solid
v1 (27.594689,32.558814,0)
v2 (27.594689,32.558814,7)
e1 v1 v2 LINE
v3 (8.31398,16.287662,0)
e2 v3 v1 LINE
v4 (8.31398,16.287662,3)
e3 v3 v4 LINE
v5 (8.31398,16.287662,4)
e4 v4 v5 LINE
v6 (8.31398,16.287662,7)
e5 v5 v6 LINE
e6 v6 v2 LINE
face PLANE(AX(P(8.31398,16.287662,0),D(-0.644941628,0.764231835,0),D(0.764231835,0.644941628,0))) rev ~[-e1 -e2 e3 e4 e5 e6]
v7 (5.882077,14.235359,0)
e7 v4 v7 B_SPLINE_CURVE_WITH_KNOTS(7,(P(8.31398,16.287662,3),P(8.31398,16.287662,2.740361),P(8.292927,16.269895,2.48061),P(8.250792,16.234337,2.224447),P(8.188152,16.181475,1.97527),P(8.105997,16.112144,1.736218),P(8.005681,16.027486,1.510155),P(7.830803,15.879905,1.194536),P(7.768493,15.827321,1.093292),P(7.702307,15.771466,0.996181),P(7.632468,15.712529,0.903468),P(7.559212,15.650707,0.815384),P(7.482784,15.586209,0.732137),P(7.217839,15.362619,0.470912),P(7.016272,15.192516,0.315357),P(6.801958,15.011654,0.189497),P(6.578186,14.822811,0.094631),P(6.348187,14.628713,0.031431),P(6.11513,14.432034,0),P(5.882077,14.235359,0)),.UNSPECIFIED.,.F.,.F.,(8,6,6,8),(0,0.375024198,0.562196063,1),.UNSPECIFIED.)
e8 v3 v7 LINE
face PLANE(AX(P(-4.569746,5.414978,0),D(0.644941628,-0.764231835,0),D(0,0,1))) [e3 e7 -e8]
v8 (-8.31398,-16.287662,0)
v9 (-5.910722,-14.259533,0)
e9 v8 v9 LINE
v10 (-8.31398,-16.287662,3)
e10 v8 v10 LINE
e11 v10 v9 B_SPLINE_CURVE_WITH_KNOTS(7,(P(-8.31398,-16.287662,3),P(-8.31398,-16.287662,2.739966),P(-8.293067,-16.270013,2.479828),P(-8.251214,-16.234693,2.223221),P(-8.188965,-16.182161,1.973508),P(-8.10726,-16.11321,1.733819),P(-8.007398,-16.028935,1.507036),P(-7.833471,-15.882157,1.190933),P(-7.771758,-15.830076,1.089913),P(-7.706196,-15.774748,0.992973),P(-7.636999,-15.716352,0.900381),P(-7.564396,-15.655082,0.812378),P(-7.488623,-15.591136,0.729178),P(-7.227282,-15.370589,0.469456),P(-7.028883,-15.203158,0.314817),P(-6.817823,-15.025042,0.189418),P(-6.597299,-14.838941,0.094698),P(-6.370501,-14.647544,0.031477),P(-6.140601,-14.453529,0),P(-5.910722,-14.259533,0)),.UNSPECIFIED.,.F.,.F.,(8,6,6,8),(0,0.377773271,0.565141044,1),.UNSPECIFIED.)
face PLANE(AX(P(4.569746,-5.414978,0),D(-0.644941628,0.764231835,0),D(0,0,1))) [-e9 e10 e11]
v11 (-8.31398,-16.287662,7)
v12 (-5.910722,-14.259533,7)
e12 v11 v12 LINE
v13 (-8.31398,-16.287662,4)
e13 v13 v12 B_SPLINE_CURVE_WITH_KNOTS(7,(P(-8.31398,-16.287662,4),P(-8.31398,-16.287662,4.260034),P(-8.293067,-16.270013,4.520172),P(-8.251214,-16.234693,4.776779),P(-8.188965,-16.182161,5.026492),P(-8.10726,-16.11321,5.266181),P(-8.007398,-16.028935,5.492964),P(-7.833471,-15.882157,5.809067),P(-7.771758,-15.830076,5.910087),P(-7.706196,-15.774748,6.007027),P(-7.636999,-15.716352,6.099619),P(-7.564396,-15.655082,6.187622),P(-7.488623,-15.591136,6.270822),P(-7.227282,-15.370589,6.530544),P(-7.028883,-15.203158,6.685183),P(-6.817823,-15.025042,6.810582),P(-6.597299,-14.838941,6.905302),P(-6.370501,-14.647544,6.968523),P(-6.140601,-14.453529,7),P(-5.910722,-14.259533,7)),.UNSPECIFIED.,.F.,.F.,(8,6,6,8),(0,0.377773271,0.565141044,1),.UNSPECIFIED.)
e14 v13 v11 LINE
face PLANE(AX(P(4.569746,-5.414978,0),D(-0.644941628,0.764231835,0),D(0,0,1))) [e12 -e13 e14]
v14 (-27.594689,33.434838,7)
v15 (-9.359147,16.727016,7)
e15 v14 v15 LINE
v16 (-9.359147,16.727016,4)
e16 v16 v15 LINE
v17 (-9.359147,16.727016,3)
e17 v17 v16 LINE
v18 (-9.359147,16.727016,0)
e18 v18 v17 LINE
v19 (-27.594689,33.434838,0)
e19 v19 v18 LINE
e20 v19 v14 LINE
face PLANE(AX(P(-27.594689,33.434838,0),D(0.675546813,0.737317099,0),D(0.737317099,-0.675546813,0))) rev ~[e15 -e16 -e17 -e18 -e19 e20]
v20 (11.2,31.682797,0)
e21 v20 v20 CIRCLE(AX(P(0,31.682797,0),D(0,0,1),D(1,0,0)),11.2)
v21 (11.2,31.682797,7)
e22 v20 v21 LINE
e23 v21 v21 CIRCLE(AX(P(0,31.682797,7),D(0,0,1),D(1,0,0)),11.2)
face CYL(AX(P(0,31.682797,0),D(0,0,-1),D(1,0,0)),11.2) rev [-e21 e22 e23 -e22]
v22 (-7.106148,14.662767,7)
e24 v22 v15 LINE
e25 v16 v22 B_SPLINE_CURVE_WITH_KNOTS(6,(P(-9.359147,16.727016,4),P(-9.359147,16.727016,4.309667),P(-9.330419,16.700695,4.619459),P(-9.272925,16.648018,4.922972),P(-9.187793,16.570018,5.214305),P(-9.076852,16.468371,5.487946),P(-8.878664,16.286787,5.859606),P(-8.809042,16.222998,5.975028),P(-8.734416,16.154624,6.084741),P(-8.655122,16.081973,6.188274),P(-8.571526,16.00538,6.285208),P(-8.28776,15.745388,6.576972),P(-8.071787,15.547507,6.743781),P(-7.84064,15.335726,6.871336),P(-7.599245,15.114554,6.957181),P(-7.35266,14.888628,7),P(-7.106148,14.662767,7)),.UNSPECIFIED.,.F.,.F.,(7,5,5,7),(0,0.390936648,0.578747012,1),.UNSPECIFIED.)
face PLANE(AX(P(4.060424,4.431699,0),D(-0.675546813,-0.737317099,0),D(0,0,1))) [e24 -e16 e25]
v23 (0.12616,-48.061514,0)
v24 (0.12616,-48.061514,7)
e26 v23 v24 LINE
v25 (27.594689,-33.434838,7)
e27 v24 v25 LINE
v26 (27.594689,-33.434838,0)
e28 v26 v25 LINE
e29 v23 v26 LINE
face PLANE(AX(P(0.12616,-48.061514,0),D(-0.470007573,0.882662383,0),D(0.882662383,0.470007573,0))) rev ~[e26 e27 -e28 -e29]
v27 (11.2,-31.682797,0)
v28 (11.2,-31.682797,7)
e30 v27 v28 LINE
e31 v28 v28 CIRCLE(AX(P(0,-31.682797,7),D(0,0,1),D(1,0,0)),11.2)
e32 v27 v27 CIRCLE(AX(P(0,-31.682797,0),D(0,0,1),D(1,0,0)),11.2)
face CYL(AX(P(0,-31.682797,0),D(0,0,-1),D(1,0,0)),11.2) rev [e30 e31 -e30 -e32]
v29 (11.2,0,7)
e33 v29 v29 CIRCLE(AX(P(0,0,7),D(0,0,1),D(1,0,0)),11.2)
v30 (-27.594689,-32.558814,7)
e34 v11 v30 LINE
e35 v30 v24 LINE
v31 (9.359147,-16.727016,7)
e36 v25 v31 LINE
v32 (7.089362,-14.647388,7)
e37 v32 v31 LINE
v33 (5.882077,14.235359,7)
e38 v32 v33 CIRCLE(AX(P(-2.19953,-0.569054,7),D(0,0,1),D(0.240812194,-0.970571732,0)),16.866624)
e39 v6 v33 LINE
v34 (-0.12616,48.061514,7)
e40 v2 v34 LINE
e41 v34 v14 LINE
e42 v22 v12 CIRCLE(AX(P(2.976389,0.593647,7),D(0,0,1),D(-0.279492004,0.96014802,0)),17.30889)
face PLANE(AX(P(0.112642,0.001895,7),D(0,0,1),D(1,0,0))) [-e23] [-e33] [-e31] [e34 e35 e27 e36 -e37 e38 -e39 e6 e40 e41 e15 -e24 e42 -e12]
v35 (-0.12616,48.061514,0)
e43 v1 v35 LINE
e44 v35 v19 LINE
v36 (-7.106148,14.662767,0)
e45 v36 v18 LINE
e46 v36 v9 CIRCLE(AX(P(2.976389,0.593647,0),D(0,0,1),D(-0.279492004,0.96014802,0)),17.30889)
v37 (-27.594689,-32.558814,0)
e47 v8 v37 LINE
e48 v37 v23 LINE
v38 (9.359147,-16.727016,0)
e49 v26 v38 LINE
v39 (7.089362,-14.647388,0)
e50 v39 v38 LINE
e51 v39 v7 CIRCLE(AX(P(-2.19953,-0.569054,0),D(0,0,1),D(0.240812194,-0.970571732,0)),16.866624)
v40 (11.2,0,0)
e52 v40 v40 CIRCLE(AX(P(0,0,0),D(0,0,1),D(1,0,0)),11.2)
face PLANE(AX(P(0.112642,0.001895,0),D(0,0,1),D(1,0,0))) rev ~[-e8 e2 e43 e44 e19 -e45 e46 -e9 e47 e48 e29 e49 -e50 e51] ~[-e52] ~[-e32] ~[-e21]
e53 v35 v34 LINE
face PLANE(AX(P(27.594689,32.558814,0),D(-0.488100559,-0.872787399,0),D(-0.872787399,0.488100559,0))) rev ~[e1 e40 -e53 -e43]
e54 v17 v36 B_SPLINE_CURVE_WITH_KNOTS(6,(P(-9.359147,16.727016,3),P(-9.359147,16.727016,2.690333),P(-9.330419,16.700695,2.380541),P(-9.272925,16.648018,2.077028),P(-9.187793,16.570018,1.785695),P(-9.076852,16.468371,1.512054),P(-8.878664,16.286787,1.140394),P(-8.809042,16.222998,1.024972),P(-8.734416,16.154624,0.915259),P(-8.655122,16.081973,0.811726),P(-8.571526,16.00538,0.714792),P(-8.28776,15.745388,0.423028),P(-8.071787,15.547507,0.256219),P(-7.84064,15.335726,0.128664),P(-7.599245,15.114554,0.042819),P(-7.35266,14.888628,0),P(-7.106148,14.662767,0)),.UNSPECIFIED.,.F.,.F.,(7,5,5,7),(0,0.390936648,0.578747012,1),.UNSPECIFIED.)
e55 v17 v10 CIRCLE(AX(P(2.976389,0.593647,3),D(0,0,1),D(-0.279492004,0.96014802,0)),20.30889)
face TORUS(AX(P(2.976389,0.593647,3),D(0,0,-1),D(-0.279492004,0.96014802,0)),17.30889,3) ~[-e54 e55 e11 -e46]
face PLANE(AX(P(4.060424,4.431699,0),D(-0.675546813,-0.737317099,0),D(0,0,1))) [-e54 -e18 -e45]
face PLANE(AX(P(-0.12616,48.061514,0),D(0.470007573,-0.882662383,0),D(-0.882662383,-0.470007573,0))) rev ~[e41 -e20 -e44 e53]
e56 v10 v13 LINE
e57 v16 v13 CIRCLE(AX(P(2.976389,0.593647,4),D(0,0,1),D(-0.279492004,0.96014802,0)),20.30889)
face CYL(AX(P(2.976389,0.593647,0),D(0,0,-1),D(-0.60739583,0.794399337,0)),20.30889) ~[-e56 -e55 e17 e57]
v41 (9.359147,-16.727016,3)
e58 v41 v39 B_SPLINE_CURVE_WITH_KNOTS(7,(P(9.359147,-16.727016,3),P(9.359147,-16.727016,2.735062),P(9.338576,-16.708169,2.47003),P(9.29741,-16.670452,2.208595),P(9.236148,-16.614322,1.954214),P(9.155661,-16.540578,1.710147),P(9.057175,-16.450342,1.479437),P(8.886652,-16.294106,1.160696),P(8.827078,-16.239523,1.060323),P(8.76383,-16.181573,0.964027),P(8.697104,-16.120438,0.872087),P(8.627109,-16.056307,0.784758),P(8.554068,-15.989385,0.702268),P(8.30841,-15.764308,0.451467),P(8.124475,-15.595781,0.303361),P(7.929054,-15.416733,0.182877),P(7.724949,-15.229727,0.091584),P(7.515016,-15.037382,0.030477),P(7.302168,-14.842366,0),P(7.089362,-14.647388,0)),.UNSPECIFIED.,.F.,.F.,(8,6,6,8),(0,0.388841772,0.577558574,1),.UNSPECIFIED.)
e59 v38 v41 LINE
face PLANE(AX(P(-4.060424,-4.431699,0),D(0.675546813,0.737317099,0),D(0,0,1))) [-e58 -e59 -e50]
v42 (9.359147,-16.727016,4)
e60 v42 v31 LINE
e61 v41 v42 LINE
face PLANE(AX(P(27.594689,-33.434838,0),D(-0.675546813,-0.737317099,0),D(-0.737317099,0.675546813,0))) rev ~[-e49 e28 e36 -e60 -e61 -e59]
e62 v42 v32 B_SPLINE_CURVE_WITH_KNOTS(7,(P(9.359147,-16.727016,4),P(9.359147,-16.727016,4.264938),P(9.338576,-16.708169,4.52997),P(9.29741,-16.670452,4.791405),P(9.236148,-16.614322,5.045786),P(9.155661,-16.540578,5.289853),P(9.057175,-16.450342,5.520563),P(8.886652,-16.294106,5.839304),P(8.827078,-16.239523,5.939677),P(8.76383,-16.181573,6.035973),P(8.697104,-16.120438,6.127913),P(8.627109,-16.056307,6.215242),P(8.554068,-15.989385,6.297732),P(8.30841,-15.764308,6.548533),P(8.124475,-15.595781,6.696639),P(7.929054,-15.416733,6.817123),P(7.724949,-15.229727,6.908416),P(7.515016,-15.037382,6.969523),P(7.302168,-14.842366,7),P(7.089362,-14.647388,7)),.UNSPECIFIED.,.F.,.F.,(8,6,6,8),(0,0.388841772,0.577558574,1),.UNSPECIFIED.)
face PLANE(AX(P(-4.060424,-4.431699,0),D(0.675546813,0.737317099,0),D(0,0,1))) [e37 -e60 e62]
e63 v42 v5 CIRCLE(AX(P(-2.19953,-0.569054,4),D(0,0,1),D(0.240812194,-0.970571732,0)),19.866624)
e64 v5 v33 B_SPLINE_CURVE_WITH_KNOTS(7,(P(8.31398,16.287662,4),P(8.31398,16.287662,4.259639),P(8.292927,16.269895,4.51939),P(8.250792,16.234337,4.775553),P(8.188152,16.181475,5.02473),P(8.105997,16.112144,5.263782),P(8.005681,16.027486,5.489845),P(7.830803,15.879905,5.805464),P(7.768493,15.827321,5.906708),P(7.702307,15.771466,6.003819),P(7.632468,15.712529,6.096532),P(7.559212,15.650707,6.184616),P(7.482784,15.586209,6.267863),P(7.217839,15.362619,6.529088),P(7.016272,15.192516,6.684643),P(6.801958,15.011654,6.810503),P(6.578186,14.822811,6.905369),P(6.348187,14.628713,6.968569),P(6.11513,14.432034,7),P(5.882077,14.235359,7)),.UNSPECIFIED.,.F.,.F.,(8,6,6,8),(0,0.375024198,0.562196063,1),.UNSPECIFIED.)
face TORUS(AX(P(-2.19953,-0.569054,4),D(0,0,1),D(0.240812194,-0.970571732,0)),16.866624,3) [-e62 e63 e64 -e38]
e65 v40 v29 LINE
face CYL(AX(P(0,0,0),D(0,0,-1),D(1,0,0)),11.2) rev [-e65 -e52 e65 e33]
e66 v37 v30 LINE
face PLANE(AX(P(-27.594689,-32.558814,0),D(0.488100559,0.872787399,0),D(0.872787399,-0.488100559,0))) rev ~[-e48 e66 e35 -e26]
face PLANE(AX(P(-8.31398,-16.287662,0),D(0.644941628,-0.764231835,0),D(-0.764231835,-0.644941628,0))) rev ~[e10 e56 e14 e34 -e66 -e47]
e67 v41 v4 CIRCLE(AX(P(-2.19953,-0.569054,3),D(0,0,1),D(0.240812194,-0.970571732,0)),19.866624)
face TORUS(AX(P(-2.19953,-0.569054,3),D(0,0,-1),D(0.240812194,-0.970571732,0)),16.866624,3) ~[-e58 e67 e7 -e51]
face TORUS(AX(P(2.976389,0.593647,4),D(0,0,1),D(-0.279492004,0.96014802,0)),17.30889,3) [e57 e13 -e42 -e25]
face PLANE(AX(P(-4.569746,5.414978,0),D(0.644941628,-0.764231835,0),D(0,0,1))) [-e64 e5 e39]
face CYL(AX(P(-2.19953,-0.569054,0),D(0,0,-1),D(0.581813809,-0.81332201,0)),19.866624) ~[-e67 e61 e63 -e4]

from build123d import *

# Parameters (mm, degrees)
F0_R         = 11.2
F1_DEPTH     = 7
F2_T4_ANGLE  = 151.1667099625
F2_T10_ANGLE = 155.7575231718
F2_T16_ANGLE = 151.1667099625
F2_T22_ANGLE = 155.7575231718


# Not quite as in the source:
# - a fillet or chamfer that OpenCascade refuses, or shapes differently, is made with other operations: its cross-section is extruded or revolved along the edge and cut away or added


with BuildPart() as f1:
    # F0 (on Top) → F1 (new body)
    with BuildSketch(Plane.XY):
        with BuildLine():
            ThreePointArc((9.3591465956, -16.7270162039), (17.6571466732, 0.0595617509), (8.3139799998, 16.2876621091))
            Line((8.3139799998, 16.2876621091), (-9.3591465956, 16.7270162039))
            ThreePointArc((-9.3591465956, 16.7270162039), (-17.3223324531, -0.048962325), (-8.3139799998, -16.2876621091))
            Line((-8.3139799998, -16.2876621091), (9.3591465956, -16.7270162039))
        make_face()
        Circle(F0_R, mode=Mode.SUBTRACT)
        Polygon((8.3139799998, 16.2876621091), (27.5946892798, 32.5588136911), (-0.1261595724, 48.0615143736), (-27.5946892798, 33.4348380566), (-9.3591465956, 16.7270162039), align=None)
        with Locations((0, 31.6827967763)):
            Circle(F0_R, mode=Mode.SUBTRACT)
        Polygon((27.5946892798, -33.4348380566), (9.3591465956, -16.7270162039), (-8.3139799998, -16.2876621091), (-27.5946892798, -32.5588136911), (0.1261595724, -48.0615143736), align=None)
        with Locations((0, -31.6827967763)):
            Circle(F0_R, mode=Mode.SUBTRACT)
    extrude(amount=F1_DEPTH)

    # F2: fillet of radius 3 on 4 edges, made by hand


with BuildPart() as f2_tool2:
    # F2_s3 → F2_t4 (revolve)
    with BuildSketch(Plane(origin=(2.9031932082, 0.8450981198, 0), x_dir=(0, 0, 1), z_dir=(0.9601480198, 0.2794920035, 0))):
        with BuildLine():
            ThreePointArc((4, -20.0470026749), (6.1213203436, -19.1683230184), (7, -17.0470026749))
            Line((7, -17.0470026749), (7, -20.0470026749))
            Line((7, -20.0470026749), (4, -20.0470026749))
        make_face()
    revolve(axis=Axis((2.9763887281, 0.5936471566, 7), (0, 0, 1)), revolution_arc=F2_T4_ANGLE)

    split(bisect_by=Plane(origin=(4.0604237069, 4.4316985467, 0), x_dir=(0, 0, 1), z_dir=(-0.6755468125, -0.7373170987, 0)), keep=Keep.TOP)

    split(bisect_by=Plane(origin=(4.569745577, -5.414978498, 0), x_dir=(0, 0, 1), z_dir=(-0.6449416276, 0.7642318346, 0)), keep=Keep.TOP)


with BuildPart() as f1_1:
    add(f1.part)

    # F2_t1: cut F2_tool2
    add(f2_tool2.part, mode=Mode.SUBTRACT)


with BuildPart() as f2_tool8:
    # F2_s9 → F2_t10 (revolve)
    with BuildSketch(Plane(origin=(-2.2049800931, -0.547085883, 0), x_dir=(0, 0, 1), z_dir=(-0.9705717322, -0.2408121936, 0))):
        with BuildLine():
            ThreePointArc((4, -19.889257837), (6.1213203436, -19.0105781805), (7, -16.889257837))
            Line((7, -16.889257837), (7, -19.889257837))
            Line((7, -19.889257837), (4, -19.889257837))
        make_face()
    revolve(axis=Axis((-2.1995295918, -0.5690536346, 7), (0, 0, 1)), revolution_arc=F2_T10_ANGLE)

    split(bisect_by=Plane(origin=(-4.0604237069, -4.4316985467, 0), x_dir=(0, 0, 1), z_dir=(0.6755468125, 0.7373170987, 0)), keep=Keep.TOP)

    split(bisect_by=Plane(origin=(-4.569745577, 5.414978498, 0), x_dir=(0, 0, 1), z_dir=(0.6449416276, -0.7642318346, 0)), keep=Keep.TOP)


with BuildPart() as f1_2:
    add(f1_1.part)

    # F2_t7: cut F2_tool8
    add(f2_tool8.part, mode=Mode.SUBTRACT)


with BuildPart() as f2_tool14:
    # F2_s15 → F2_t16 (revolve)
    with BuildSketch(Plane(origin=(2.9031932082, 0.8450981198, 0), x_dir=(0, 0, 1), z_dir=(0.9601480198, 0.2794920035, 0))):
        with BuildLine():
            ThreePointArc((3, -20.0470026749), (0.8786796564, -19.1683230184), (0, -17.0470026749))
            Line((0, -17.0470026749), (0, -20.0470026749))
            Line((0, -20.0470026749), (3, -20.0470026749))
        make_face()
    revolve(axis=Axis((2.9763887281, 0.5936471566, 0), (0, 0, 1)), revolution_arc=F2_T16_ANGLE)

    split(bisect_by=Plane(origin=(4.0604237069, 4.4316985467, 0), x_dir=(0, 0, 1), z_dir=(-0.6755468125, -0.7373170987, 0)), keep=Keep.TOP)

    split(bisect_by=Plane(origin=(4.569745577, -5.414978498, 0), x_dir=(0, 0, 1), z_dir=(-0.6449416276, 0.7642318346, 0)), keep=Keep.TOP)


with BuildPart() as f1_3:
    add(f1_2.part)

    # F2_t13: cut F2_tool14
    add(f2_tool14.part, mode=Mode.SUBTRACT)


with BuildPart() as f2_tool20:
    # F2_s21 → F2_t22 (revolve)
    with BuildSketch(Plane(origin=(-2.2049800931, -0.547085883, 0), x_dir=(0, 0, 1), z_dir=(-0.9705717322, -0.2408121936, 0))):
        with BuildLine():
            ThreePointArc((3, -19.889257837), (0.8786796564, -19.0105781805), (0, -16.889257837))
            Line((0, -16.889257837), (0, -19.889257837))
            Line((0, -19.889257837), (3, -19.889257837))
        make_face()
    revolve(axis=Axis((-2.1995295918, -0.5690536346, 0), (0, 0, 1)), revolution_arc=F2_T22_ANGLE)

    split(bisect_by=Plane(origin=(-4.0604237069, -4.4316985467, 0), x_dir=(0, 0, 1), z_dir=(0.6755468125, 0.7373170987, 0)), keep=Keep.TOP)

    split(bisect_by=Plane(origin=(-4.569745577, 5.414978498, 0), x_dir=(0, 0, 1), z_dir=(0.6449416276, -0.7642318346, 0)), keep=Keep.TOP)


with BuildPart() as f1_4:
    add(f1_3.part)

    # F2_t19: cut F2_tool20
    add(f2_tool20.part, mode=Mode.SUBTRACT)


solid = f1_4.part
